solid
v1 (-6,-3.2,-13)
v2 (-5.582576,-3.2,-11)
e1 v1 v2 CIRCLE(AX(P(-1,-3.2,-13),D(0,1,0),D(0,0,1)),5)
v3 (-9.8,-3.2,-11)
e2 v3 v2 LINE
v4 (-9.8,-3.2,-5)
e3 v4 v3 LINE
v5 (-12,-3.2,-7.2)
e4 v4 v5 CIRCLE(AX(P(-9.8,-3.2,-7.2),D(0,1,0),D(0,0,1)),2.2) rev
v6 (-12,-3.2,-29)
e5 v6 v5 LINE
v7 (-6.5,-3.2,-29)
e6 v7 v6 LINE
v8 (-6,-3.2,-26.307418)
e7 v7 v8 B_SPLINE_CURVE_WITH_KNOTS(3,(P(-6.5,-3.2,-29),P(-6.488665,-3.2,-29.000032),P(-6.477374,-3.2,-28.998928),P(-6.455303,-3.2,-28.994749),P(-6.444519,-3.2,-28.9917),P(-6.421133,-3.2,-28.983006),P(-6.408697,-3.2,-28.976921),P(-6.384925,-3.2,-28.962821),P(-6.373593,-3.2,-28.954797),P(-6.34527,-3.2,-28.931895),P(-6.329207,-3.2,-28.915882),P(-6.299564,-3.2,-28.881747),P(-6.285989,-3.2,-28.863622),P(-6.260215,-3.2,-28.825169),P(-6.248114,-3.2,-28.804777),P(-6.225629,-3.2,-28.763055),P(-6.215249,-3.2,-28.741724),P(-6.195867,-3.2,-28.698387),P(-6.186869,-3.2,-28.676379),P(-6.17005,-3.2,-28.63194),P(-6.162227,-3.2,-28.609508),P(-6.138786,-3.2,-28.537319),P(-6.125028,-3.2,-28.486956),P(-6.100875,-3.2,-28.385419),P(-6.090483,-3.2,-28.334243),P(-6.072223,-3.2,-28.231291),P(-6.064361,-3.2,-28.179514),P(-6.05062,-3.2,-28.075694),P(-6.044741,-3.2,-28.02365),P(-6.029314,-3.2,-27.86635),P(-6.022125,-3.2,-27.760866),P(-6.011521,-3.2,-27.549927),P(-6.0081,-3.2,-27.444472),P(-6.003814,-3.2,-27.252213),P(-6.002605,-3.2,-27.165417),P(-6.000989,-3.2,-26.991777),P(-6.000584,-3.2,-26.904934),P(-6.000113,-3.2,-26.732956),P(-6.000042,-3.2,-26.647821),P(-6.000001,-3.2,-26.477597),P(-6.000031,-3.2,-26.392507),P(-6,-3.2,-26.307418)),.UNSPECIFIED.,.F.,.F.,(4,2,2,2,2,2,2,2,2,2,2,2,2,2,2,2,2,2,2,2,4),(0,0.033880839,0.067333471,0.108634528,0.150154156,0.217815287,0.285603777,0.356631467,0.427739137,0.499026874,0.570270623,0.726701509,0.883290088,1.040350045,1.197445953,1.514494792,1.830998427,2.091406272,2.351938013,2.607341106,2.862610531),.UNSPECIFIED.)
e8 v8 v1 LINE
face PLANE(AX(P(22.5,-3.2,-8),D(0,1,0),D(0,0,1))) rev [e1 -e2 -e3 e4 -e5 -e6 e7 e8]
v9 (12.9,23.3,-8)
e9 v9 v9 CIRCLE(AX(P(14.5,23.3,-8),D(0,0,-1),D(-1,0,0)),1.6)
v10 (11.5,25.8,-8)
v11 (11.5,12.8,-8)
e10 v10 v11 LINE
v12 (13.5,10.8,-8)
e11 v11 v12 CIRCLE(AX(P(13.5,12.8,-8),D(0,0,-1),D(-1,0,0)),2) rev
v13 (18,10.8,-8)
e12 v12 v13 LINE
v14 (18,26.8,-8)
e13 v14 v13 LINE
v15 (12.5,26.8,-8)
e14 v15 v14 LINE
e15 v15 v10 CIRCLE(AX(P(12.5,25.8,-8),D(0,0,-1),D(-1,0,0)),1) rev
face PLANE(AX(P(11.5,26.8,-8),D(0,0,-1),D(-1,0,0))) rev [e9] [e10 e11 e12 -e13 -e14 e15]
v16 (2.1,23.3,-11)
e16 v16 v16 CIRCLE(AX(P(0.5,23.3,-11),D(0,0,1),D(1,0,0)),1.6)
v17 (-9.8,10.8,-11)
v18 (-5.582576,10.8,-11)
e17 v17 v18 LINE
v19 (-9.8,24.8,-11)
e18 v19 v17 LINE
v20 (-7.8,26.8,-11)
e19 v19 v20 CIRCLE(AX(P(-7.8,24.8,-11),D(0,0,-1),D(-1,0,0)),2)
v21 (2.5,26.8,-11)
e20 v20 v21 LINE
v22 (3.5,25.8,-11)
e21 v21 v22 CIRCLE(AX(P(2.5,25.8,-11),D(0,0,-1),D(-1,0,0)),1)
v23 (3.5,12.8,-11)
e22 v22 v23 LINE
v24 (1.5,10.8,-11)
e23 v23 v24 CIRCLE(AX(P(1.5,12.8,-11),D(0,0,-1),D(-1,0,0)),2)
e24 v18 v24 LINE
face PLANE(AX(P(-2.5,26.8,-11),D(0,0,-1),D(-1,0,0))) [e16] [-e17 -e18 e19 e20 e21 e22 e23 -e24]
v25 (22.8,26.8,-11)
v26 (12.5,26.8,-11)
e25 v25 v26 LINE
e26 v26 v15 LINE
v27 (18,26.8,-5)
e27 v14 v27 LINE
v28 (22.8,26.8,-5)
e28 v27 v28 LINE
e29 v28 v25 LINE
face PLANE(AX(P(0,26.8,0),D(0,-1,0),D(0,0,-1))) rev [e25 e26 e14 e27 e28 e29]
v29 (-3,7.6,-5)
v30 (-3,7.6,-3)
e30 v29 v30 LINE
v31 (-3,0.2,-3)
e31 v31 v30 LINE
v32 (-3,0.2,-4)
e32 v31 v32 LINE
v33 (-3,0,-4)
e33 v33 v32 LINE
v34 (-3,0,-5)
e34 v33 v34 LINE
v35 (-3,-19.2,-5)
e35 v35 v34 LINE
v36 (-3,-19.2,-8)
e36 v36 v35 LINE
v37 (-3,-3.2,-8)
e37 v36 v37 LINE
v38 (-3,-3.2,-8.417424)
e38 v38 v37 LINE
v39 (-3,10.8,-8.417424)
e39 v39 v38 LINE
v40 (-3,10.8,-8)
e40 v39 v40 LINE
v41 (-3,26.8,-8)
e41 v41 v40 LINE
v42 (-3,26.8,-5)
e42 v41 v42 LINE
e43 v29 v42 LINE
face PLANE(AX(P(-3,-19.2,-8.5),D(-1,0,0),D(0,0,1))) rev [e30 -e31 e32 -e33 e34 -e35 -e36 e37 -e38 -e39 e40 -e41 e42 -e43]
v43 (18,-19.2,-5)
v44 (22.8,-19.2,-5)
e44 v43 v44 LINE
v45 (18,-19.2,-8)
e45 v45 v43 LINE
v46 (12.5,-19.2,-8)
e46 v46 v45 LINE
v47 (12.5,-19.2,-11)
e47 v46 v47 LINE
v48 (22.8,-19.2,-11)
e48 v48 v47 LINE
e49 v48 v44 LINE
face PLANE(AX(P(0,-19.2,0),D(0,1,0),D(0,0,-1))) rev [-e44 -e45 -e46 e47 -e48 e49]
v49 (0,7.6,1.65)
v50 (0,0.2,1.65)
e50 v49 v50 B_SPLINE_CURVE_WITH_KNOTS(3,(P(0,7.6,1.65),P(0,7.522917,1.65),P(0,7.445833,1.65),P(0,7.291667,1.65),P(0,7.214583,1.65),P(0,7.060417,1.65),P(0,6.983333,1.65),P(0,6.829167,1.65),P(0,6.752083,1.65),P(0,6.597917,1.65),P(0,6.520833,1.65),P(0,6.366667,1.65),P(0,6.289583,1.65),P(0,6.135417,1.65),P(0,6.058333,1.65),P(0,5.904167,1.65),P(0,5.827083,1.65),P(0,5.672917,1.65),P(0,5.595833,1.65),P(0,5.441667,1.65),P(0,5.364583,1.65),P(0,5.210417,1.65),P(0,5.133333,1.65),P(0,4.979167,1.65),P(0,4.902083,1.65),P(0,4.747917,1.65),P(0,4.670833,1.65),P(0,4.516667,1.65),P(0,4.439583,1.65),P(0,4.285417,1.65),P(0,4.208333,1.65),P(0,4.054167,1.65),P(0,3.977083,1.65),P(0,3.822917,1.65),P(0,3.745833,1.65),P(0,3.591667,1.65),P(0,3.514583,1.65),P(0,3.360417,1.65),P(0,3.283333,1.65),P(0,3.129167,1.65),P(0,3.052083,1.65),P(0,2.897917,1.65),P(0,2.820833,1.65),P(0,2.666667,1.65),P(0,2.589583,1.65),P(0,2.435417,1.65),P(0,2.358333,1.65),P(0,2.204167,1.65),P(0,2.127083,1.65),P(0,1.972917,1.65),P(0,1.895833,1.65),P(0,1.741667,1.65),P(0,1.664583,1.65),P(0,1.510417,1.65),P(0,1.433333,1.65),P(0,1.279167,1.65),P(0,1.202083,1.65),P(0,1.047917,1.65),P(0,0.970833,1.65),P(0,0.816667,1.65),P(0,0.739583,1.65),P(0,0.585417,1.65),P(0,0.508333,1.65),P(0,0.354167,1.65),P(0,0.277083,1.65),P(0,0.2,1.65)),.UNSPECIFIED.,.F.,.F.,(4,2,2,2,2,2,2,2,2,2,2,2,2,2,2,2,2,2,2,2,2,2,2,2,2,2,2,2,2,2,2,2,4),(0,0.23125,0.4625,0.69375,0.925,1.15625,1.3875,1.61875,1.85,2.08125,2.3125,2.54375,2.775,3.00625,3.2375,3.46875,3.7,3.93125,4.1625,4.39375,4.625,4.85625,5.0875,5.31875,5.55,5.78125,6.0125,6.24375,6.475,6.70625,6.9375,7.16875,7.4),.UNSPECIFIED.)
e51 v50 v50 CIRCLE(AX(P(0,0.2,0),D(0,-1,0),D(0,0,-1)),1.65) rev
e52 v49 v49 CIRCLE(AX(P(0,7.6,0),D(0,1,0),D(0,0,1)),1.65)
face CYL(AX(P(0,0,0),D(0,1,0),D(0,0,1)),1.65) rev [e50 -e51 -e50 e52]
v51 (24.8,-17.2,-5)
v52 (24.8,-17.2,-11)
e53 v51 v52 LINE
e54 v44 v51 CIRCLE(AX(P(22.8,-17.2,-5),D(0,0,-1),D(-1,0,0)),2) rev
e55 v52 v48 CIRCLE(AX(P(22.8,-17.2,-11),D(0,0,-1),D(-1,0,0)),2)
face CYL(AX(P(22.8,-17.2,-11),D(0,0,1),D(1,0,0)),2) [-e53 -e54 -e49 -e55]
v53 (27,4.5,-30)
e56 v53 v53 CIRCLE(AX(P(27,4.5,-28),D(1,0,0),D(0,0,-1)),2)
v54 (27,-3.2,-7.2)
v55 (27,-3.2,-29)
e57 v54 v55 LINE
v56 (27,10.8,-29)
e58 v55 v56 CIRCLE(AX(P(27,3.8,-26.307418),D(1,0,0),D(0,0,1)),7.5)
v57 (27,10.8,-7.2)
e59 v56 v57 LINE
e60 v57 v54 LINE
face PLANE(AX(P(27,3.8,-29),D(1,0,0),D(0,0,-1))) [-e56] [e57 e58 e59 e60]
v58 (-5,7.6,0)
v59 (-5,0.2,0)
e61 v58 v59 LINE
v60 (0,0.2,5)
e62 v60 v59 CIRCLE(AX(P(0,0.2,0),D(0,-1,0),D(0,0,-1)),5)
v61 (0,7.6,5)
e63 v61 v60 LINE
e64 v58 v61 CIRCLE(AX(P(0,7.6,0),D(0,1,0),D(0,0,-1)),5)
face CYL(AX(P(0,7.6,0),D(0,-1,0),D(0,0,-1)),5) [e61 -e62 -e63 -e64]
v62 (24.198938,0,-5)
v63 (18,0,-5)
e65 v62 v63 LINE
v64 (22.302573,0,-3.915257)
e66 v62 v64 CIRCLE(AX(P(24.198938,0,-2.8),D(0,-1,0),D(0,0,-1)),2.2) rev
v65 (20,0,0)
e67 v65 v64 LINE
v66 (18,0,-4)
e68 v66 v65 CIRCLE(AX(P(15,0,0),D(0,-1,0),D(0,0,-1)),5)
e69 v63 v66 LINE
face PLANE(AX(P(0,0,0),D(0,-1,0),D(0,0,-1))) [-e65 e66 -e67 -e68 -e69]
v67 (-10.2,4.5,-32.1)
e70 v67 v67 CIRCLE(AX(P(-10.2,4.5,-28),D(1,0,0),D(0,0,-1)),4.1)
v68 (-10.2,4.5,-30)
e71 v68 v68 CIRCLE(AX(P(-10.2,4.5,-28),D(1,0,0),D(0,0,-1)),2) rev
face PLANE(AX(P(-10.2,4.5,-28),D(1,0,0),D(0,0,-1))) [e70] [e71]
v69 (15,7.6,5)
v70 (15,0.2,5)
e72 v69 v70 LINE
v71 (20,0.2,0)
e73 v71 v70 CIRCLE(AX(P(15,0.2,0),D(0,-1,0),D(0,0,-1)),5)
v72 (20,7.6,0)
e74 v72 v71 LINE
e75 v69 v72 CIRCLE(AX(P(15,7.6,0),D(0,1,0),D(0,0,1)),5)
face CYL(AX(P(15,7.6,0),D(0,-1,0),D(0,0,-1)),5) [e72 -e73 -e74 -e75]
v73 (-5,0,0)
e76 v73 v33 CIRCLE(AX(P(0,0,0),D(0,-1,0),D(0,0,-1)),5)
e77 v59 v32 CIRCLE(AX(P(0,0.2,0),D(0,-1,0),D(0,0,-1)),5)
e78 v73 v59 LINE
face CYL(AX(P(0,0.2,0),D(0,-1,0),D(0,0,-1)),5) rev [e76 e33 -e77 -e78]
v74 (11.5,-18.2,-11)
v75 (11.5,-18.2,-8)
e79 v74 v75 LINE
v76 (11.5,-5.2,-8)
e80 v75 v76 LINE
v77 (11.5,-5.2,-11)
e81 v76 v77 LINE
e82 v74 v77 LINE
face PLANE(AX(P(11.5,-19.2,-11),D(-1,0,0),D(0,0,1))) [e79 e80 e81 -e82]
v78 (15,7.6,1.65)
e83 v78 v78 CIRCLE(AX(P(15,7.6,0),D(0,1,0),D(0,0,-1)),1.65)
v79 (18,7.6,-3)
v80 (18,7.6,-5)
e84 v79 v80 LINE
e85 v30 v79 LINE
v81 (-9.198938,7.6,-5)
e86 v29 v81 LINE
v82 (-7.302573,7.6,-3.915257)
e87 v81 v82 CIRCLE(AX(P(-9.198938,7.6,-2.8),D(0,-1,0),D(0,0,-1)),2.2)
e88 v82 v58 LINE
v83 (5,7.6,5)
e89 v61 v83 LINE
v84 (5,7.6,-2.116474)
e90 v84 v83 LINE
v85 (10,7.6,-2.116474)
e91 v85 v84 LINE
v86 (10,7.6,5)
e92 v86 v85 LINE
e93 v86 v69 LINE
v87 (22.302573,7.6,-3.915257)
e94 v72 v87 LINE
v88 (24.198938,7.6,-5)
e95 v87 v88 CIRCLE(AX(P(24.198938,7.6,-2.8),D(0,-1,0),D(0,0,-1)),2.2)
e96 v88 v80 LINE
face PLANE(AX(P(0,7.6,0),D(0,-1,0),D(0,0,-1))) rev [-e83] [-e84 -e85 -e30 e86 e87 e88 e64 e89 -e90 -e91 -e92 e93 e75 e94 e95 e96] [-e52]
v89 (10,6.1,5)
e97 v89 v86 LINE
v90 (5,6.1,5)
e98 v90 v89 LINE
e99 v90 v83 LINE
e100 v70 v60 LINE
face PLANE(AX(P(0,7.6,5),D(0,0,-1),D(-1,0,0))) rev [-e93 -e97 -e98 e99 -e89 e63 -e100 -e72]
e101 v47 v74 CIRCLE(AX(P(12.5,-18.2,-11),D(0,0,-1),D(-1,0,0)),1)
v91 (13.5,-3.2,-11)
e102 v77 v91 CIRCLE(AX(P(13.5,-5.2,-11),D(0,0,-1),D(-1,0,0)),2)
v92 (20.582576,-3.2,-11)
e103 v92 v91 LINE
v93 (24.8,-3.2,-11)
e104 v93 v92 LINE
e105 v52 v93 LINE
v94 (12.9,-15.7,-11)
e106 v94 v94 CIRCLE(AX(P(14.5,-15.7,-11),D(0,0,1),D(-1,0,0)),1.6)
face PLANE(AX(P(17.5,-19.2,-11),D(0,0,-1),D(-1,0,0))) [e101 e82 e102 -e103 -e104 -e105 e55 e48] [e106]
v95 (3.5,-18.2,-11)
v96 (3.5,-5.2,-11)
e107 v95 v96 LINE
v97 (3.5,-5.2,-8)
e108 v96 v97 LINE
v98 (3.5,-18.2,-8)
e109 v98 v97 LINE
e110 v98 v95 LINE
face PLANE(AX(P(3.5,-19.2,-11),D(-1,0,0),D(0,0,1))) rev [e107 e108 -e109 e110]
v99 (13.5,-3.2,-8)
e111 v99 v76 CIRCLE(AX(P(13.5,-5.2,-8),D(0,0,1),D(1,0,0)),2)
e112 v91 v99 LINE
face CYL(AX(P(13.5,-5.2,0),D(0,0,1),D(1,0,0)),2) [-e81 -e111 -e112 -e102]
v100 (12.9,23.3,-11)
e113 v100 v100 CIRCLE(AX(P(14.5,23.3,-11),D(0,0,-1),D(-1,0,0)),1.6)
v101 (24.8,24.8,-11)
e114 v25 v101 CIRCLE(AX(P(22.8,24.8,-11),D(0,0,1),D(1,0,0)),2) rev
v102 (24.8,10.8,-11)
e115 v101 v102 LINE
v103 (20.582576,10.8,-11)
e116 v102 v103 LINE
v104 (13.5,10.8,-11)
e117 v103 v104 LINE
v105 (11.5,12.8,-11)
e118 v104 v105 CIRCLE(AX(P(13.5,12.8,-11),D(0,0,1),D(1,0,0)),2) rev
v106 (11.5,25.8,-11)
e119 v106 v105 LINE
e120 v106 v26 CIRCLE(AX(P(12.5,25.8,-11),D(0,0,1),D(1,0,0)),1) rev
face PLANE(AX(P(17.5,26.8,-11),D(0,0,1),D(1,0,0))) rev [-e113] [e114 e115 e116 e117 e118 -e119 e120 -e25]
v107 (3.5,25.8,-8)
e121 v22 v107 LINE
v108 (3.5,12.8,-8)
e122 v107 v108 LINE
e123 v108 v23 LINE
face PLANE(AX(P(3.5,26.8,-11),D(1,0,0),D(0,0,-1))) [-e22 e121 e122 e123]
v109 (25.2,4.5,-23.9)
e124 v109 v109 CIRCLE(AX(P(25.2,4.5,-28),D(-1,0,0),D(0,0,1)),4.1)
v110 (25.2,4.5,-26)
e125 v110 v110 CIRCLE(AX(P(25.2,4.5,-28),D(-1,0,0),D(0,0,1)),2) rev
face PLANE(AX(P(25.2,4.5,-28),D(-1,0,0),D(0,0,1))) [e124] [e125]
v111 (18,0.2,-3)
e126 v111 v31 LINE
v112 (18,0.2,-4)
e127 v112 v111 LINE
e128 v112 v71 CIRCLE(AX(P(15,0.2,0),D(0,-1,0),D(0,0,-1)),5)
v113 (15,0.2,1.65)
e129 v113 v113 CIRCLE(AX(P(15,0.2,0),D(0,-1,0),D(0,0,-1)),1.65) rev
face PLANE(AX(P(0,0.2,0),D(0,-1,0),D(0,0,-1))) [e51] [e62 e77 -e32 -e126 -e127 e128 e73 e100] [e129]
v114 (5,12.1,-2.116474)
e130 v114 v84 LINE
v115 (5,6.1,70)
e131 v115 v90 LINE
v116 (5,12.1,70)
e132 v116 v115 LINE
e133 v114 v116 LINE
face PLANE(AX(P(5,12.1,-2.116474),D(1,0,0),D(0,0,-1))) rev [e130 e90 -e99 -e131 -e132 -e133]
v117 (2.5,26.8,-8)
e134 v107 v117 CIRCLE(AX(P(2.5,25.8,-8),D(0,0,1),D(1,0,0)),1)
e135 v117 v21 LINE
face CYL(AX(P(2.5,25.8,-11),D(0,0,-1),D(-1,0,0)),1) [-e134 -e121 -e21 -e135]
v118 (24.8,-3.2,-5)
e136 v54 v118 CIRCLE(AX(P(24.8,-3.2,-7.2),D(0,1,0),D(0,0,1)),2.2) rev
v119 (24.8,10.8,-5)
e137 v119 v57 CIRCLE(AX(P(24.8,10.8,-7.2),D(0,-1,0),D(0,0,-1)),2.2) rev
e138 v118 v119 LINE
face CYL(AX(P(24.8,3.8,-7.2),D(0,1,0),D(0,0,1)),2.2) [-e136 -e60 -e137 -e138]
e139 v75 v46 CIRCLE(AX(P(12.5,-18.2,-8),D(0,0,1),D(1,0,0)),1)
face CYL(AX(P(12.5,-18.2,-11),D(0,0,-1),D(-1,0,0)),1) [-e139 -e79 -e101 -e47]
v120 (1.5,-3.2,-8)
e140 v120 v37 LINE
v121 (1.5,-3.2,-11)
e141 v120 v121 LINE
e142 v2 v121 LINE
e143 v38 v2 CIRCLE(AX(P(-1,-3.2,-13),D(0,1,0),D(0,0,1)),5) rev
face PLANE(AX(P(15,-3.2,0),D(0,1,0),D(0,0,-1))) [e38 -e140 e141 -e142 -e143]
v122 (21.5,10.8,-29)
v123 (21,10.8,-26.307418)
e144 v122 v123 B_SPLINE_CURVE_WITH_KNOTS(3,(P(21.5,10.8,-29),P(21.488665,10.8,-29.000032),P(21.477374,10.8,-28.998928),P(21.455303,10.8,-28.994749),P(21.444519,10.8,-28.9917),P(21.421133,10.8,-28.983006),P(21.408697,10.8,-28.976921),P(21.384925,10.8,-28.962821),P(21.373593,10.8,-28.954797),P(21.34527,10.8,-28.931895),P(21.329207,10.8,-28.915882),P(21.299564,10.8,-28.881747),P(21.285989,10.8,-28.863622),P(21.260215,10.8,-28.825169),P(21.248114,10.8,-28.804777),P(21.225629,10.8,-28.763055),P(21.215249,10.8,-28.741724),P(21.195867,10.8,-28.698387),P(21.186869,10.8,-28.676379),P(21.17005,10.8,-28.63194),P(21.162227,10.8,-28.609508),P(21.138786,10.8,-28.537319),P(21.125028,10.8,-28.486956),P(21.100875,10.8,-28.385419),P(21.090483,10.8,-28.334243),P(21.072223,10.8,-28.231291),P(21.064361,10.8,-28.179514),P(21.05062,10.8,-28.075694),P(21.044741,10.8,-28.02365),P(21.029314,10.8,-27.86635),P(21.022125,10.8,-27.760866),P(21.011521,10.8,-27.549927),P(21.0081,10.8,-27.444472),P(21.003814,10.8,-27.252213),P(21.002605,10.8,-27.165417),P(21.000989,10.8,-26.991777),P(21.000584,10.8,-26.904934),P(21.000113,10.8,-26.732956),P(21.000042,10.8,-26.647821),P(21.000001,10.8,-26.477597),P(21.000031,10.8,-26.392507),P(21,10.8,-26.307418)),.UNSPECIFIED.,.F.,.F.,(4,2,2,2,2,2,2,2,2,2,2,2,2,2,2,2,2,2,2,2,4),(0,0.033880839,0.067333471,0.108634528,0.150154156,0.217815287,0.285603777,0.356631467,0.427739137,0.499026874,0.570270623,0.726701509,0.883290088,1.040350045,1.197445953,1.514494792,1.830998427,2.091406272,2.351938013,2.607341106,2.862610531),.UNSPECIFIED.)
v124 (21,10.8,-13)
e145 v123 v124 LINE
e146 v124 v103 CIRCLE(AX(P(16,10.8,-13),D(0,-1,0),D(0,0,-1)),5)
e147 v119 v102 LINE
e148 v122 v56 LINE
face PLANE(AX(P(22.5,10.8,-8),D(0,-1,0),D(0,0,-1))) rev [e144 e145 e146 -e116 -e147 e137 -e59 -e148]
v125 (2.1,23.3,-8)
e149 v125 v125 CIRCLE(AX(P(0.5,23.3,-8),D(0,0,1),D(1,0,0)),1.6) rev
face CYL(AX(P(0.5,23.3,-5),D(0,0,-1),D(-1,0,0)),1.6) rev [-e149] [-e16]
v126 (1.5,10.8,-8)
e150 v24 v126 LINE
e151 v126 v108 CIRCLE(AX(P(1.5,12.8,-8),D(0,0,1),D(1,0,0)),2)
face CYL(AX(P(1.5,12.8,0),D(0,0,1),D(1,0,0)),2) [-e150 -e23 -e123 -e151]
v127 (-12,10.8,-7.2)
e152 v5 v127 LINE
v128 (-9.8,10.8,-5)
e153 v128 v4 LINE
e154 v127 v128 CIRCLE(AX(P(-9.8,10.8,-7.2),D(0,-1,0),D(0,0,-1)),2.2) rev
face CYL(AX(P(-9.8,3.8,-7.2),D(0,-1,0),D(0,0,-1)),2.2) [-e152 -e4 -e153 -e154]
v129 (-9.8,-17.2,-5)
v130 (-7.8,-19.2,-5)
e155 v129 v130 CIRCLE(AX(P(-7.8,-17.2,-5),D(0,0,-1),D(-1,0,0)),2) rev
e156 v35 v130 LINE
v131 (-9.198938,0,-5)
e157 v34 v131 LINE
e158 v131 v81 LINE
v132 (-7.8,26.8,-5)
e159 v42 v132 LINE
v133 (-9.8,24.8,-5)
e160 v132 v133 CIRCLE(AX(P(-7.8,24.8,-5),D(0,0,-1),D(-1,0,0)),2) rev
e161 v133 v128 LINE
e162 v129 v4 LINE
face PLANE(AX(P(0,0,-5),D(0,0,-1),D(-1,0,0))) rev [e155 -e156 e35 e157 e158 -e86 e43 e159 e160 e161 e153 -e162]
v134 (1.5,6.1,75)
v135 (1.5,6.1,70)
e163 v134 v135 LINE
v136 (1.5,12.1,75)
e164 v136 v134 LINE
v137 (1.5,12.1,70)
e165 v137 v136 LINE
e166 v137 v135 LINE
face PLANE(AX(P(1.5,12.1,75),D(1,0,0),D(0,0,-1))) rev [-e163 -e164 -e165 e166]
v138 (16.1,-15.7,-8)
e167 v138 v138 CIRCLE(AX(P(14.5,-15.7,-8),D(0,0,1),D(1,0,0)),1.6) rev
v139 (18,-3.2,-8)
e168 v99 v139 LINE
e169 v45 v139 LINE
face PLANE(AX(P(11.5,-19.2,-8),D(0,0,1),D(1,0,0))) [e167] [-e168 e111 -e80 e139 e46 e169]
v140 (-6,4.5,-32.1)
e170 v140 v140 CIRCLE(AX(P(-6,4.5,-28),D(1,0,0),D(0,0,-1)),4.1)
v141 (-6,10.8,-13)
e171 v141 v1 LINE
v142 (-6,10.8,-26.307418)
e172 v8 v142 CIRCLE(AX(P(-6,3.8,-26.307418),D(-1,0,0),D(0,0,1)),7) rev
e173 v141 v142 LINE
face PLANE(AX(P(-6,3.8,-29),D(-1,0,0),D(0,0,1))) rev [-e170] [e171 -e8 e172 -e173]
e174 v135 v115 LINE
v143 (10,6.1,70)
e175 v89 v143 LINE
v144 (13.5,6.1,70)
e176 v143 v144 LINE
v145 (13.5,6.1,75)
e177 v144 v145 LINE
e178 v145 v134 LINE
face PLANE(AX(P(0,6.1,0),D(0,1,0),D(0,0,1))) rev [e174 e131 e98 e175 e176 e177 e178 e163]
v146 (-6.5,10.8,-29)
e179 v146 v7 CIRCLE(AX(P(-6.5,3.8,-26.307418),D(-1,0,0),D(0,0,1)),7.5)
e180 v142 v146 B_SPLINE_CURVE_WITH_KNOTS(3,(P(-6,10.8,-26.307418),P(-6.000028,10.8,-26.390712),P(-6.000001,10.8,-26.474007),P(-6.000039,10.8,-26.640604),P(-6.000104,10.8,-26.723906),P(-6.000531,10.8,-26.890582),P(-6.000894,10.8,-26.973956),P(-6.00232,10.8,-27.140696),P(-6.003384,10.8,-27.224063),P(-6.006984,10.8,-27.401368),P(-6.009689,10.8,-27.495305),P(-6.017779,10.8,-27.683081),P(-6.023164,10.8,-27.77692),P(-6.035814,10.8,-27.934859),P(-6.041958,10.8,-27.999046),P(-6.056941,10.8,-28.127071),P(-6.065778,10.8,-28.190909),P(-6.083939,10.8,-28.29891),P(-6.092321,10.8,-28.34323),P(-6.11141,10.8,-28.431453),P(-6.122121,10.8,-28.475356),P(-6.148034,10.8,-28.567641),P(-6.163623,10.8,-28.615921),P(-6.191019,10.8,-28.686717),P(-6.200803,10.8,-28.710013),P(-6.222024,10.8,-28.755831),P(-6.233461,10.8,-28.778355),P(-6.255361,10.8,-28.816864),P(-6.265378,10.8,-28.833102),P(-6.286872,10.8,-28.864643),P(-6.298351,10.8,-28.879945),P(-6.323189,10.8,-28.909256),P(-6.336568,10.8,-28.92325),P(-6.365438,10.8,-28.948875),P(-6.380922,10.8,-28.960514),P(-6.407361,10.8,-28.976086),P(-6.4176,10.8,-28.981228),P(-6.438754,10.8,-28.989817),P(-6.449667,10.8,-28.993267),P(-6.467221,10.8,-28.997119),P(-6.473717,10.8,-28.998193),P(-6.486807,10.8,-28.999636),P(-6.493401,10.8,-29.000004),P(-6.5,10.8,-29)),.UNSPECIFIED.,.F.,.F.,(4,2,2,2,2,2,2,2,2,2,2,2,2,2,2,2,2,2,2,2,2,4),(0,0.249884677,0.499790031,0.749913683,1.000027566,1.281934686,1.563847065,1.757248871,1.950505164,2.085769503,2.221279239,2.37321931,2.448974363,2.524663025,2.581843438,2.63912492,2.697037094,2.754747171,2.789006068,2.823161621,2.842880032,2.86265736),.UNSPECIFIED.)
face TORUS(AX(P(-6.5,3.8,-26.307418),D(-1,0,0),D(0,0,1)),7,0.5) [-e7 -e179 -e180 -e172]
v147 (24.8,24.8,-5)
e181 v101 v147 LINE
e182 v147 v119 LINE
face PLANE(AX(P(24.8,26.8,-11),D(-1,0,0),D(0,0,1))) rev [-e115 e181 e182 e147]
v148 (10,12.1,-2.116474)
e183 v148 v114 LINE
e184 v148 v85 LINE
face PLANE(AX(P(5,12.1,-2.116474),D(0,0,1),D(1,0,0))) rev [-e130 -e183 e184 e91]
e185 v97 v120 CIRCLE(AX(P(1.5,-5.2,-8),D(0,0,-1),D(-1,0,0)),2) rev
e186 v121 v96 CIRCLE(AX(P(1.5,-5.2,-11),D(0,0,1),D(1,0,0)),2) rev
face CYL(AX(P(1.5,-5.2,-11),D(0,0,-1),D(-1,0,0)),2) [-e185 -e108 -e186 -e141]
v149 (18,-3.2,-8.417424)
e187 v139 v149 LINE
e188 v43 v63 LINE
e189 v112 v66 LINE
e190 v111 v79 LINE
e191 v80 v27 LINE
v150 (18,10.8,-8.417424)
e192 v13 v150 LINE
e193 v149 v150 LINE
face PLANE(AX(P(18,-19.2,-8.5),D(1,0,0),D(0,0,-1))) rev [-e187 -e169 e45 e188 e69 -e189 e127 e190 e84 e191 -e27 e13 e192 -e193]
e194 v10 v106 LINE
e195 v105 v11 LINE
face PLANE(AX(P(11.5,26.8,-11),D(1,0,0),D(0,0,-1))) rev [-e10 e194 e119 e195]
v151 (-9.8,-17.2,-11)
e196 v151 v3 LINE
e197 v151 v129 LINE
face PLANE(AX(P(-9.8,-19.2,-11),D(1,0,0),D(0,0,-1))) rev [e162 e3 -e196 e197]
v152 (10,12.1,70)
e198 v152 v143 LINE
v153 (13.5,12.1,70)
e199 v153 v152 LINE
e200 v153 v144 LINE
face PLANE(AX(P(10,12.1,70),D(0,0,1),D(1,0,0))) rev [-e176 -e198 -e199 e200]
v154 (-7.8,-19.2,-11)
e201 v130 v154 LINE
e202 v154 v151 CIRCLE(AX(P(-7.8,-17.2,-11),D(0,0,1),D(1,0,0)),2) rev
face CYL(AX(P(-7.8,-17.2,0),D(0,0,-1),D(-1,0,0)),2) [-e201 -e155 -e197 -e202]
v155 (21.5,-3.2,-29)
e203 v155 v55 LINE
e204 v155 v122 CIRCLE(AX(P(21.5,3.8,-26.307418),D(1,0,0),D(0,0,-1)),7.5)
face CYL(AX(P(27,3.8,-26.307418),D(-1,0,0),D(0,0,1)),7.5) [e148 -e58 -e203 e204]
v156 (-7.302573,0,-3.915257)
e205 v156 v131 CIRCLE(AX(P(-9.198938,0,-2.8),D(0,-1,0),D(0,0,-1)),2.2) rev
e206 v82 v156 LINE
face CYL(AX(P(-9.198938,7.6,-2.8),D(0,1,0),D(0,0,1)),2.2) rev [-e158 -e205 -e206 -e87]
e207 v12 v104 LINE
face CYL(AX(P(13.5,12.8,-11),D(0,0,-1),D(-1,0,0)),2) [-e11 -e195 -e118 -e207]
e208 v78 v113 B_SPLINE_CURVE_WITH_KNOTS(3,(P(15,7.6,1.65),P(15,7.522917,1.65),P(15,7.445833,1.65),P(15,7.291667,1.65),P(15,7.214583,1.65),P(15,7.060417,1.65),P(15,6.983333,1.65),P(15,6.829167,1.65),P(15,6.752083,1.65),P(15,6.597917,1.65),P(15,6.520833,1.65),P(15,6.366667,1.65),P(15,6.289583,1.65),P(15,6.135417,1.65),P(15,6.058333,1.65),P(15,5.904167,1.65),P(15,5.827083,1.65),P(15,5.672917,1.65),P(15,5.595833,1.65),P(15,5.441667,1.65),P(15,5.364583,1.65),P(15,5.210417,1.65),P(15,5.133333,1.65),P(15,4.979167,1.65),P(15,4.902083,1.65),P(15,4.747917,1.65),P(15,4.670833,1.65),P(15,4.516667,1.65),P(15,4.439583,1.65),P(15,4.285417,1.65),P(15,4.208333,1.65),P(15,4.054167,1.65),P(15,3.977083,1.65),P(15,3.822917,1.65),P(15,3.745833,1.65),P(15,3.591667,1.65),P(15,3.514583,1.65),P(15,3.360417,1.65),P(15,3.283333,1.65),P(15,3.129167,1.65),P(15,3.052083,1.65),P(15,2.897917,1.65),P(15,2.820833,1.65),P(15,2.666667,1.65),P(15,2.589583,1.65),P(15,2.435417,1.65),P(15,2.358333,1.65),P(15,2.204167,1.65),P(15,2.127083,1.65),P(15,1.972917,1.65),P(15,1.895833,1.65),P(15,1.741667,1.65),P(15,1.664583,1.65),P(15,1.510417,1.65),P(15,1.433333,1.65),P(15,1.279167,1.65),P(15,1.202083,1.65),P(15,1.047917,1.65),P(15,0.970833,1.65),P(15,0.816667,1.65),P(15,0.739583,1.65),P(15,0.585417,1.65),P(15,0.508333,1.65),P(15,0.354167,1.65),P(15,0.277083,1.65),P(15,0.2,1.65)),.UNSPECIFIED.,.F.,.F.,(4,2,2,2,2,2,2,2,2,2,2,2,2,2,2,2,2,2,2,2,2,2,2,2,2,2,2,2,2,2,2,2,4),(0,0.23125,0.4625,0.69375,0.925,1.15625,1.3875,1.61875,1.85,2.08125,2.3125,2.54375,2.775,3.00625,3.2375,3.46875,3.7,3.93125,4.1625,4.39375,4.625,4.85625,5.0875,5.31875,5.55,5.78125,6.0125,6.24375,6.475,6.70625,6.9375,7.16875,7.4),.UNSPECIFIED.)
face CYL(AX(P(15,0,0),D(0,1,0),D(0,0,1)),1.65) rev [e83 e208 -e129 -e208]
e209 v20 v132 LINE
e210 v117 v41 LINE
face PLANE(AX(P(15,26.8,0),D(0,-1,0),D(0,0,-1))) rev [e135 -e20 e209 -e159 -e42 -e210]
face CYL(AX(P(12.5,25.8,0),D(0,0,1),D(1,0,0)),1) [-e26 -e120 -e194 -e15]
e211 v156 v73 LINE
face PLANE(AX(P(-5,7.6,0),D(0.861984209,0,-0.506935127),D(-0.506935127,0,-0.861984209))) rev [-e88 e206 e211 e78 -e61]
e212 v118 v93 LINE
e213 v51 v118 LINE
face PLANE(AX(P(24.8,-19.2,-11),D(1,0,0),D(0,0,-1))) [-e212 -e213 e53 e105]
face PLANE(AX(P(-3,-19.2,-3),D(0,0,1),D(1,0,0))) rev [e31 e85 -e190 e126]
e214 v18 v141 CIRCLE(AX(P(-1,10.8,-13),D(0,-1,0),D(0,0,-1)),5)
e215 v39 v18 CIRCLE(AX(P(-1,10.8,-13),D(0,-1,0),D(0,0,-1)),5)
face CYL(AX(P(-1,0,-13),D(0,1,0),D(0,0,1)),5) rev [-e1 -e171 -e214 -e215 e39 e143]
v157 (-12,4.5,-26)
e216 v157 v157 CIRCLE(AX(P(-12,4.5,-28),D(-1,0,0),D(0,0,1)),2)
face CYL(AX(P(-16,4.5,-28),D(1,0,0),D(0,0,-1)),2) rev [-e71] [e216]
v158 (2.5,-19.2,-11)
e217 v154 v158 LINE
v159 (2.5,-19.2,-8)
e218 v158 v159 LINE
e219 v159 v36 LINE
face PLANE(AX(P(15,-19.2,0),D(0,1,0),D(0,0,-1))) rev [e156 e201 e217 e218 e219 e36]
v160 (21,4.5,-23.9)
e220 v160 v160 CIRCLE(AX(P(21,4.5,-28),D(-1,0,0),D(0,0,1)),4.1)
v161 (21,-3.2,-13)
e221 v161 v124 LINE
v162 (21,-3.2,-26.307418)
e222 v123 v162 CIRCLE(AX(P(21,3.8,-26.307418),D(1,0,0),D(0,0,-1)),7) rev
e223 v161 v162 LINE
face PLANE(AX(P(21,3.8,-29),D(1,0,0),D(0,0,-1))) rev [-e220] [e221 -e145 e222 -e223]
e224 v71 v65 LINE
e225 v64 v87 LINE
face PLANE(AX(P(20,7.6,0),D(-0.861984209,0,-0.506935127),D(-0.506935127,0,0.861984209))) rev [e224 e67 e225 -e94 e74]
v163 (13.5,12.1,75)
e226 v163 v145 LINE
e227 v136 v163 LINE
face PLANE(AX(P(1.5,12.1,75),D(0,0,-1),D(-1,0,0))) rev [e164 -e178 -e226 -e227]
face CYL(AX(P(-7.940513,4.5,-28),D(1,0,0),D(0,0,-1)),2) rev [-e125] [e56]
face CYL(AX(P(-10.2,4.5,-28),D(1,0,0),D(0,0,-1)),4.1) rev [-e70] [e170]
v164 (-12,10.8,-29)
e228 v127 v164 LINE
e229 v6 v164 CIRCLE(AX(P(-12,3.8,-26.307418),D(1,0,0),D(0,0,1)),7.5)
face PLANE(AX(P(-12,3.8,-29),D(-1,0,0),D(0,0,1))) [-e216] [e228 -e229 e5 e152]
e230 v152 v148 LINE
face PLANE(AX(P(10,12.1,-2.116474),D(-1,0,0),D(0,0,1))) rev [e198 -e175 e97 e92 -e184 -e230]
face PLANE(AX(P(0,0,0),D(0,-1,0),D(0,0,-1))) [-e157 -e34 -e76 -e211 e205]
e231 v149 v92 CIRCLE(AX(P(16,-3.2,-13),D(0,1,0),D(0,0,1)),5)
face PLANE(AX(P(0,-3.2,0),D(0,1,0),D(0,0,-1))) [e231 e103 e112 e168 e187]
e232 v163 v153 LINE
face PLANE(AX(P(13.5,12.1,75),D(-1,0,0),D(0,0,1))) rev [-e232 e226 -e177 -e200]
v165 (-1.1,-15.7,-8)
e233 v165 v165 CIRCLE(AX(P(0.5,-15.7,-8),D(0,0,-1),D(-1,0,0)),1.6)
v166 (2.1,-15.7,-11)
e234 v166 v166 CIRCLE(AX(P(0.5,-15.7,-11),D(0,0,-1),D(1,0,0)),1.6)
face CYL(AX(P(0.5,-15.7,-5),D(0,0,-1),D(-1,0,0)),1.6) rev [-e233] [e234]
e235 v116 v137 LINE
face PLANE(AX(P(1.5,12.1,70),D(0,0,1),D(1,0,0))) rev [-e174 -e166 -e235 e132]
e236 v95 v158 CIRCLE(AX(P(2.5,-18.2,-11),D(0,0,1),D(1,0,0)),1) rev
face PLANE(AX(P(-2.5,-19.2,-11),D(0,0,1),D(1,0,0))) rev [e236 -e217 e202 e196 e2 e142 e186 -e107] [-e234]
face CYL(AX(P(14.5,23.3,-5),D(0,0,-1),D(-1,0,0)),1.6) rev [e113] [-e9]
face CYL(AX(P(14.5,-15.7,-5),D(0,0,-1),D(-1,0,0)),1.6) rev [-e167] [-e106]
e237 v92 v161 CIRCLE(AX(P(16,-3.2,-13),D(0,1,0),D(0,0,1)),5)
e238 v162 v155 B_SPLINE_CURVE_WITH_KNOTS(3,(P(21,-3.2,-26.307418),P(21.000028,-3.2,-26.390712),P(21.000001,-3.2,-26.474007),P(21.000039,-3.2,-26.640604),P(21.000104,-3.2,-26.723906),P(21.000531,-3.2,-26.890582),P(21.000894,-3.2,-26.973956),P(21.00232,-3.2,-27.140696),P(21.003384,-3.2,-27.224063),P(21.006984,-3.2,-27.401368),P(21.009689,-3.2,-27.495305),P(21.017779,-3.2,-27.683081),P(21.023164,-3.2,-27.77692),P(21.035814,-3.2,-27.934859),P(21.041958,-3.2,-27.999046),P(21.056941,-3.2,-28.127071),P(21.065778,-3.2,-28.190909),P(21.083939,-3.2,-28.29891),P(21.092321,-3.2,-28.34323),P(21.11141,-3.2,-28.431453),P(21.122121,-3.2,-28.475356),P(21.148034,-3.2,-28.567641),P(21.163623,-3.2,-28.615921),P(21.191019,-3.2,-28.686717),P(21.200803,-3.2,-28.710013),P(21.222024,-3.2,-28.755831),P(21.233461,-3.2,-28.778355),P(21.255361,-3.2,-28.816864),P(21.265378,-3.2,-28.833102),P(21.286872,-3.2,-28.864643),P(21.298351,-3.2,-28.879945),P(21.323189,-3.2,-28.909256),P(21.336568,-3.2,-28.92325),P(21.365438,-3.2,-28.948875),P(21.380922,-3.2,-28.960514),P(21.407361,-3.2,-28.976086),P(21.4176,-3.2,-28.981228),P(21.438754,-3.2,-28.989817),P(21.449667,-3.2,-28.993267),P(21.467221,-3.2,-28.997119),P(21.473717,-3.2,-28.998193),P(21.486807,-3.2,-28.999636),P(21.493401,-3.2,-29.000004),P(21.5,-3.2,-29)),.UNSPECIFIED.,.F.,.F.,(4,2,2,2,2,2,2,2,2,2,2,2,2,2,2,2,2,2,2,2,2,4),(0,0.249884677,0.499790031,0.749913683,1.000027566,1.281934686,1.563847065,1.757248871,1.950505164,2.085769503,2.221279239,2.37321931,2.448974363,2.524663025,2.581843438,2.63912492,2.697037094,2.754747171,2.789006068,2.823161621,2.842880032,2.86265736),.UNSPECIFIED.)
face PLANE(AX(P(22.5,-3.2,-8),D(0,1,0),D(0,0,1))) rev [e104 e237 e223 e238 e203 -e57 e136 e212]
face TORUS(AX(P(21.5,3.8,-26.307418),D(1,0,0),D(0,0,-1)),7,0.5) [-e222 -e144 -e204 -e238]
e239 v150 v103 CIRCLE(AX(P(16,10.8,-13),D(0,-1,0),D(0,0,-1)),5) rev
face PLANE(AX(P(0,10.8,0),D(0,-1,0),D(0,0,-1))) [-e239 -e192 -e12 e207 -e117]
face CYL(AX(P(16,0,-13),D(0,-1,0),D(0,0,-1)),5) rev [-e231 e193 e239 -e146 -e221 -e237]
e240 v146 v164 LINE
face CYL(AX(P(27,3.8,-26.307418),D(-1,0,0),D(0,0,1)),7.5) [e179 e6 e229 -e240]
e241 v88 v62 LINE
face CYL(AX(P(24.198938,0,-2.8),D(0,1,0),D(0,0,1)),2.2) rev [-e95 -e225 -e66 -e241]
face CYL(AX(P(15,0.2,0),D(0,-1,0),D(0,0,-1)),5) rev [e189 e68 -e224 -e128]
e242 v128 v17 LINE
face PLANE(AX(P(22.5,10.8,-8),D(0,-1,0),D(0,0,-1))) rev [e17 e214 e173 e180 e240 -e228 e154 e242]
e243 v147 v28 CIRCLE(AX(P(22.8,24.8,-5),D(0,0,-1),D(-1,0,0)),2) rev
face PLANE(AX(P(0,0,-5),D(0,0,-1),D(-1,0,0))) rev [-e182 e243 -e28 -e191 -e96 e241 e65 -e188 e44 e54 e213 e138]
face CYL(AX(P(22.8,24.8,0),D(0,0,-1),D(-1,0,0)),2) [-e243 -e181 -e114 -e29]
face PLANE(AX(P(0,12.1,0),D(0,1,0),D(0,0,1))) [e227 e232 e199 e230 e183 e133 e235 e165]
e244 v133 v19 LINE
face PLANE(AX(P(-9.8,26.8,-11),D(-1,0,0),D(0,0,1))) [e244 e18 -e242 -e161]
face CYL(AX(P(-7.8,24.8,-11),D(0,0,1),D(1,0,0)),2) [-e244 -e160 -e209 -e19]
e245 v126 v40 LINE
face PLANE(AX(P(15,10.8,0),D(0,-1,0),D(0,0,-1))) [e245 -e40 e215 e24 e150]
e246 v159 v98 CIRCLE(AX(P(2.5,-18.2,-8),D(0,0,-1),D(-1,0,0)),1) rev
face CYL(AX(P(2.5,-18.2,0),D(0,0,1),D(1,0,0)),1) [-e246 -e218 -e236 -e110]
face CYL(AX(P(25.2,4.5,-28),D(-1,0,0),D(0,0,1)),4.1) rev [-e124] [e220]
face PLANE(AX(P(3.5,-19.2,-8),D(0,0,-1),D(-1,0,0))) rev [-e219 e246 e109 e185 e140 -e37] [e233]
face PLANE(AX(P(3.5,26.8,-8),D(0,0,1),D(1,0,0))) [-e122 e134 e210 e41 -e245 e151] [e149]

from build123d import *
from OCP.BRepFilletAPI import BRepFilletAPI_MakeFillet

# Parameters (mm, degrees)
EXTRUDE_1_DEPTH           = 7.6
SKETCH_3_R                = 1.65
CUT_EXTRUDE_2_DEPTH       = 25.678475018
SKETCH_5_W                = 30
SKETCH_5_H                = 14
EXTRUDE_3_DEPTH           = 3
CUT_EXTRUDE_7_DEPTH       = 0.2
EXTRUDE_9_DEPTH           = 4.5
EXTRUDE_9_DEPTH_BACK      = 1.5
SKETCH_24_R               = 2
CUT_EXTRUDE_8_DEPTH       = 52.317437946
EXTRUDE_10_DEPTH          = 4.5
EXTRUDE_10_DEPTH_BACK     = 1.5
SKETCH_28_R               = 2
CUT_EXTRUDE_9_DEPTH       = 10
FILLET_1_R                = 5
EXTRUDE_11_DEPTH          = 4.5
FILLET_3_R                = 2.2
EXTRUDE_12_DEPTH          = 1.5
SKETCH_33_R               = 4.1
CUT_EXTRUDE_10_DEPTH      = 4.2
CUT_EXTRUDE_START         = -4.2
SKETCH_35_R               = 4.1
CUT_EXTRUDE_11_DEPTH      = 4.2
SKETCH_36_W               = 21
SKETCH_36_H               = 3.5
CUT_EXTRUDE_12_DEPTH      = 30
EXTRUDE_16_DEPTH          = 16
SKETCH_44_R               = 1.6
CUT_EXTRUDE_15_DEPTH      = 6
FILLET_4_R1               = 2
FILLET_4_R2               = 1
FILLET_5_R                = 2
FILLET_4_OF_MIRROR_1_R1   = 2
FILLET_4_OF_MIRROR_1_R2   = 1
FILLET_5_OF_MIRROR_1_R    = 2
MIRROR_START              = -11
MIRROR_2_DEPTH            = 6
MIRROR_2_2_OUTLINE_R      = 1.6
MIRROR_2_2_DEPTH          = 3
SKETCH_45_W               = 21
SKETCH_45_H               = 2
CUT_EXTRUDE_16_DEPTH      = 85.096611109
CUT_EXTRUDE_17_DEPTH      = 87.210440203
CUT_EXTRUDE_17_DEPTH_BACK = 87.210440203
FILLET_6_R                = 0.5


# Read off the part's stored shape, not the designer's step: 镜向2
with BuildPart() as part:
    # 草图1 → 凸台-拉伸1 (new body)
    with BuildSketch(Plane(origin=(0, 0, 0), x_dir=(1, 0, 0), z_dir=(0, 1, 0))):
        with BuildLine():
            Line((0, 5), (15, 5))
            Line((15, 5), (22.940512837, 5))
            Line((22.940512837, 5), (20, 0))
            ThreePointArc((20, 0), (18.535533906, -3.535533906), (15, -5))
            Line((15, -5), (0, -5))
            ThreePointArc((0, -5), (-3.535533906, -3.535533906), (-5, 0))
            Line((-5, 0), (-7.940512837, 5))
            Line((-7.940512837, 5), (0, 5))
        make_face()
    extrude(amount=EXTRUDE_1_DEPTH)

    # 草图3 → 切除-拉伸2 (cut, through all)
    with BuildSketch(Plane(origin=(0, 7.6, 0), x_dir=(1, 0, 0), z_dir=(0, 1, 0))):
        with Locations(Location((0, 0, 0), (0, 0, 270))):
            Circle(SKETCH_3_R)
        with Locations(Location((15, 0, 0), (0, 0, 270))):
            Circle(SKETCH_3_R)
    extrude(amount=-CUT_EXTRUDE_2_DEPTH, mode=Mode.SUBTRACT)

    # 草图5 → 凸台-拉伸3 (add)
    with BuildSketch(Plane(origin=(0, 0, -5), x_dir=(-1, 0, 0), z_dir=(0, 0, -1))):
        with Locations((-7.5, 3.8)):
            Rectangle(SKETCH_5_W, SKETCH_5_H)
    extrude(amount=EXTRUDE_3_DEPTH)

    # 草图10 → 切除-拉伸7 (cut)
    with BuildSketch(Plane.XZ):
        with BuildLine():
            Line((0, 5), (15, 5))
            ThreePointArc((15, 5), (20, 0), (15, -5))
            Line((15, -5), (0, -5))
            ThreePointArc((0, -5), (-5, 0), (0, 5))
        make_face()
    extrude(amount=-CUT_EXTRUDE_7_DEPTH, mode=Mode.SUBTRACT)

    # 草图21 → 凸台-拉伸9 (add, two sides: drawn at the far end of the back side and taken through both)
    with BuildSketch(Plane(origin=(22.5, 0, 0), x_dir=(0, 0, -1), z_dir=(1, 0, 0)).offset(-EXTRUDE_9_DEPTH_BACK)):
        with BuildLine():
            Line((5, 10.8), (29, 10.8))
            ThreePointArc((29, 10.8), (36, 3.8), (29, -3.2))
            Line((29, -3.2), (5, -3.2))
            Line((5, -3.2), (5, 10.8))
        make_face()
    extrude(amount=EXTRUDE_9_DEPTH + EXTRUDE_9_DEPTH_BACK)

    # 草图24 → 切除-拉伸8 (cut, through all)
    with BuildSketch(Plane(origin=(27, 0, 0), x_dir=(0, 0, -1), z_dir=(1, 0, 0))):
        with Locations((28, 4.5)):
            Circle(SKETCH_24_R)
    extrude(amount=-CUT_EXTRUDE_8_DEPTH, mode=Mode.SUBTRACT)

    # 草图25 → 凸台-拉伸10 (add, two sides: drawn at the far end of the back side and taken through both)
    with BuildSketch(Plane.ZY.offset(7.5).offset(-EXTRUDE_10_DEPTH_BACK)):
        with BuildLine():
            Line((-5, -3.2), (-29, -3.2))
            ThreePointArc((-29, -3.2), (-36, 3.8), (-29, 10.8))
            Line((-29, 10.8), (-5, 10.8))
            Line((-5, 10.8), (-5, -3.2))
        make_face()
    extrude(amount=EXTRUDE_10_DEPTH + EXTRUDE_10_DEPTH_BACK)

    # 草图28 → 切除-拉伸9 (cut)
    with BuildSketch(Plane(origin=(-6, 0, 0), x_dir=(0, 0, -1), z_dir=(1, 0, 0))):
        with Locations((28, 4.5)):
            Circle(SKETCH_28_R)
    extrude(amount=-CUT_EXTRUDE_9_DEPTH, mode=Mode.SUBTRACT)

    # 圆角1
    fillet_1_edges = [part.edges().sort_by_distance(p)[0] for p in [
        (-6, 3.8, -8),
        (21, 3.8, -8),
    ]]
    fillet(fillet_1_edges, radius=FILLET_1_R)

    # 草图30 → 凸台-拉伸11 (add)
    with BuildSketch(Plane(origin=(0, 7.6, 0), x_dir=(1, 0, 0), z_dir=(0, 1, 0))):
        Polygon((10, -70), (13.5, -70), (13.5, -75), (1.5, -75), (1.5, -70), (5, -70), (5, 2.116473595), (10, 2.116473595), align=None)
    extrude(amount=EXTRUDE_11_DEPTH)

    # 圆角3
    fillet_3_edges = [part.edges().sort_by_distance(p)[0] for p in [
        (-12, 3.8, -5),
        (-7.940512837, 3.8, -5),
        (22.940512837, 3.8, -5),
        (27, 3.8, -5),
    ]]
    fillet(fillet_3_edges, radius=FILLET_3_R)

    # 草图31 → 凸台-拉伸12 (add)
    with BuildSketch(Plane.XZ.offset(-7.6)):
        Polygon((5, 70), (5, 5), (10, 5), (10, 70), (13.5, 70), (13.5, 75), (1.5, 75), (1.5, 70), align=None)
    extrude(amount=EXTRUDE_12_DEPTH)

    # 草图33 → 切除-拉伸10 (cut)
    with BuildSketch(Plane.ZY.offset(-21)):
        with Locations((-28, 4.5)):
            Circle(SKETCH_33_R)
    extrude(amount=-CUT_EXTRUDE_10_DEPTH, mode=Mode.SUBTRACT)

    # 草图35 → 切除-拉伸11 (cut)
    with BuildSketch(Plane(origin=(-6, 0, 0), x_dir=(0, 0, -1), z_dir=(1, 0, 0)).offset(CUT_EXTRUDE_START)):
        with Locations(Location((28, 4.5, 0), (0, 0, 180))):
            Circle(SKETCH_35_R)
    extrude(amount=CUT_EXTRUDE_11_DEPTH, mode=Mode.SUBTRACT)

    # 草图36 → 切除-拉伸12 (cut)
    with BuildSketch(Plane(origin=(0, 10.8, 0), x_dir=(1, 0, 0), z_dir=(0, 1, 0))):
        with Locations((7.5, 6.75)):
            Rectangle(SKETCH_36_W, SKETCH_36_H)
    extrude(amount=-CUT_EXTRUDE_12_DEPTH, mode=Mode.SUBTRACT)

    # 草图41 → 凸台-拉伸16 (add)
    with BuildSketch(Plane(origin=(0, 10.8, 0), x_dir=(1, 0, 0), z_dir=(0, 1, 0))):
        Polygon((17.5, 11), (11.5, 11), (11.5, 8), (18, 8), (18, 5), (24.8, 5), (24.8, 11), align=None)
    extrude_16 = extrude(amount=EXTRUDE_16_DEPTH)

    # 草图44 → 切除-拉伸15 (cut)
    with BuildSketch(Plane(origin=(0, 0, -11), x_dir=(-1, 0, 0), z_dir=(0, 0, -1))):
        with Locations((-14.5, 23.3)):
            Circle(SKETCH_44_R)
    cut_extrude_15 = extrude(amount=-CUT_EXTRUDE_15_DEPTH, mode=Mode.SUBTRACT)

    # 圆角4: one fillet with a radius per group of edges: ONE call of the kernel's fillet builder (fillet() takes one radius for all edges)
    fillet_4_edges_1 = [part.edges().sort_by_distance(p)[0] for p in [
        (11.5, 10.8, -9.5),
    ]]
    fillet_4_edges_2 = [part.edges().sort_by_distance(p)[0] for p in [
        (11.5, 26.8, -9.5),
    ]]
    fillet_4 = BRepFilletAPI_MakeFillet(part.part.solid().wrapped)
    for e in fillet_4_edges_1:
        fillet_4.Add(FILLET_4_R1, e.wrapped)
    for e in fillet_4_edges_2:
        fillet_4.Add(FILLET_4_R2, e.wrapped)
    add(Compound.cast(fillet_4.Shape()), mode=Mode.REPLACE)

    # 圆角5
    fillet_5_edges = [part.edges().sort_by_distance(p)[0] for p in [
        (24.8, 26.8, -8),
    ]]
    fillet(fillet_5_edges, radius=FILLET_5_R)

    # 镜向1: 凸台-拉伸16, 切除-拉伸15 across plane
    add(extrude_16.mirror(Plane(origin=(7.5, 0, 0), x_dir=(0, 0, 1), z_dir=(1, 0, 0))))
    add(cut_extrude_15.mirror(Plane(origin=(7.5, 0, 0), x_dir=(0, 0, 1), z_dir=(1, 0, 0))), mode=Mode.SUBTRACT)

    # 圆角4 of 镜向1: one fillet with a radius per group of edges: ONE call of the kernel's fillet builder (fillet() takes one radius for all edges)
    fillet_4_of_mirror_1_edges_1 = [part.edges().sort_by_distance(p)[0] for p in [
        (3.5, 10.8, -9.5),
    ]]
    fillet_4_of_mirror_1_edges_2 = [part.edges().sort_by_distance(p)[0] for p in [
        (3.5, 26.8, -9.5),
    ]]
    fillet_4_of_mirror_1 = BRepFilletAPI_MakeFillet(part.part.solid().wrapped)
    for e in fillet_4_of_mirror_1_edges_1:
        fillet_4_of_mirror_1.Add(FILLET_4_OF_MIRROR_1_R1, e.wrapped)
    for e in fillet_4_of_mirror_1_edges_2:
        fillet_4_of_mirror_1.Add(FILLET_4_OF_MIRROR_1_R2, e.wrapped)
    add(Compound.cast(fillet_4_of_mirror_1.Shape()), mode=Mode.REPLACE)

    # 圆角5 of 镜向1
    fillet_5_of_mirror_1_edges = [part.edges().sort_by_distance(p)[0] for p in [
        (-9.8, 26.8, -8),
    ]]
    fillet(fillet_5_of_mirror_1_edges, radius=FILLET_5_OF_MIRROR_1_R)

    # 镜向2 outline → 镜向2 (add)
    with BuildSketch(Plane.XY.offset(MIRROR_START)):
        with BuildLine():
            Line((18, -3.2), (18, -19.2))
            Line((18, -19.2), (22.8, -19.2))
            ThreePointArc((22.8, -19.2), (24.214213562, -18.614213562), (24.8, -17.2))
            Line((24.8, -17.2), (24.8, -3.2))
            Line((24.8, -3.2), (18, -3.2))
        make_face()
        with BuildLine():
            Line((-3, -19.2), (-3, -3.2))
            Line((-3, -3.2), (-9.8, -3.2))
            Line((-9.8, -3.2), (-9.8, -17.2))
            ThreePointArc((-9.8, -17.2), (-9.214213562, -18.614213562), (-7.8, -19.2))
            Line((-7.8, -19.2), (-3, -19.2))
        make_face()
    extrude(amount=MIRROR_2_DEPTH)

    # Mirror 2 2 outline → Mirror 2 2 (add)
    # profile 1 of 2: a face of its own
    with BuildSketch(Plane.XY.offset(MIRROR_START)):
        with BuildLine():
            Line((12.5, -19.2), (18, -19.2))
            Line((18, -19.2), (18, -3.2))
            Line((18, -3.2), (13.5, -3.2))
            ThreePointArc((13.5, -3.2), (12.085786438, -3.785786438), (11.5, -5.2))
            Line((11.5, -5.2), (11.5, -18.2))
            ThreePointArc((11.5, -18.2), (11.792893219, -18.907106781), (12.5, -19.2))
        make_face()
        with Locations((14.5, -15.7)):
            Circle(MIRROR_2_2_OUTLINE_R, mode=Mode.SUBTRACT)
    # profile 2 of 2: a face of its own
    with BuildSketch(Plane.XY.offset(MIRROR_START)):
        with BuildLine():
            Line((1.5, -3.2), (-3, -3.2))
            Line((-3, -3.2), (-3, -19.2))
            Line((-3, -19.2), (2.5, -19.2))
            ThreePointArc((2.5, -19.2), (3.207106781, -18.907106781), (3.5, -18.2))
            Line((3.5, -18.2), (3.5, -5.2))
            ThreePointArc((3.5, -5.2), (2.914213562, -3.785786438), (1.5, -3.2))
        make_face()
        with Locations((0.5, -15.7)):
            Circle(MIRROR_2_2_OUTLINE_R, mode=Mode.SUBTRACT)
    extrude(amount=MIRROR_2_2_DEPTH)

    # 草图45 → 切除-拉伸16 (cut, through all)
    with BuildSketch(Plane(origin=(0, 7.6, 0), x_dir=(1, 0, 0), z_dir=(0, 1, 0))):
        with Locations((7.5, 4)):
            Rectangle(SKETCH_45_W, SKETCH_45_H)
    extrude(amount=-CUT_EXTRUDE_16_DEPTH, mode=Mode.SUBTRACT)

    # 草图46 → 切除-拉伸17 (cut, two sides: drawn at the far end of the back side and taken through both)
    with BuildSketch(Plane.ZY.offset(-21).offset(-CUT_EXTRUDE_17_DEPTH_BACK)):
        with BuildLine():
            ThreePointArc((-29, 10.8), (-33.807417596, 3.8), (-29, -3.2))
            ThreePointArc((-29, -3.2), (-36, 3.8), (-29, 10.8))
        make_face()
    extrude(amount=CUT_EXTRUDE_17_DEPTH + CUT_EXTRUDE_17_DEPTH_BACK, mode=Mode.SUBTRACT)

    # 圆角6
    fillet_6_edges = [part.edges().sort_by_distance(p)[0] for p in [
        (21, 3.8, -33.807417596),
        (-6, 3.8, -33.807417596),
    ]]
    fillet(fillet_6_edges, radius=FILLET_6_R - 0.0001)  # a hair under: the kernel refuses the full size


solid = part.part
